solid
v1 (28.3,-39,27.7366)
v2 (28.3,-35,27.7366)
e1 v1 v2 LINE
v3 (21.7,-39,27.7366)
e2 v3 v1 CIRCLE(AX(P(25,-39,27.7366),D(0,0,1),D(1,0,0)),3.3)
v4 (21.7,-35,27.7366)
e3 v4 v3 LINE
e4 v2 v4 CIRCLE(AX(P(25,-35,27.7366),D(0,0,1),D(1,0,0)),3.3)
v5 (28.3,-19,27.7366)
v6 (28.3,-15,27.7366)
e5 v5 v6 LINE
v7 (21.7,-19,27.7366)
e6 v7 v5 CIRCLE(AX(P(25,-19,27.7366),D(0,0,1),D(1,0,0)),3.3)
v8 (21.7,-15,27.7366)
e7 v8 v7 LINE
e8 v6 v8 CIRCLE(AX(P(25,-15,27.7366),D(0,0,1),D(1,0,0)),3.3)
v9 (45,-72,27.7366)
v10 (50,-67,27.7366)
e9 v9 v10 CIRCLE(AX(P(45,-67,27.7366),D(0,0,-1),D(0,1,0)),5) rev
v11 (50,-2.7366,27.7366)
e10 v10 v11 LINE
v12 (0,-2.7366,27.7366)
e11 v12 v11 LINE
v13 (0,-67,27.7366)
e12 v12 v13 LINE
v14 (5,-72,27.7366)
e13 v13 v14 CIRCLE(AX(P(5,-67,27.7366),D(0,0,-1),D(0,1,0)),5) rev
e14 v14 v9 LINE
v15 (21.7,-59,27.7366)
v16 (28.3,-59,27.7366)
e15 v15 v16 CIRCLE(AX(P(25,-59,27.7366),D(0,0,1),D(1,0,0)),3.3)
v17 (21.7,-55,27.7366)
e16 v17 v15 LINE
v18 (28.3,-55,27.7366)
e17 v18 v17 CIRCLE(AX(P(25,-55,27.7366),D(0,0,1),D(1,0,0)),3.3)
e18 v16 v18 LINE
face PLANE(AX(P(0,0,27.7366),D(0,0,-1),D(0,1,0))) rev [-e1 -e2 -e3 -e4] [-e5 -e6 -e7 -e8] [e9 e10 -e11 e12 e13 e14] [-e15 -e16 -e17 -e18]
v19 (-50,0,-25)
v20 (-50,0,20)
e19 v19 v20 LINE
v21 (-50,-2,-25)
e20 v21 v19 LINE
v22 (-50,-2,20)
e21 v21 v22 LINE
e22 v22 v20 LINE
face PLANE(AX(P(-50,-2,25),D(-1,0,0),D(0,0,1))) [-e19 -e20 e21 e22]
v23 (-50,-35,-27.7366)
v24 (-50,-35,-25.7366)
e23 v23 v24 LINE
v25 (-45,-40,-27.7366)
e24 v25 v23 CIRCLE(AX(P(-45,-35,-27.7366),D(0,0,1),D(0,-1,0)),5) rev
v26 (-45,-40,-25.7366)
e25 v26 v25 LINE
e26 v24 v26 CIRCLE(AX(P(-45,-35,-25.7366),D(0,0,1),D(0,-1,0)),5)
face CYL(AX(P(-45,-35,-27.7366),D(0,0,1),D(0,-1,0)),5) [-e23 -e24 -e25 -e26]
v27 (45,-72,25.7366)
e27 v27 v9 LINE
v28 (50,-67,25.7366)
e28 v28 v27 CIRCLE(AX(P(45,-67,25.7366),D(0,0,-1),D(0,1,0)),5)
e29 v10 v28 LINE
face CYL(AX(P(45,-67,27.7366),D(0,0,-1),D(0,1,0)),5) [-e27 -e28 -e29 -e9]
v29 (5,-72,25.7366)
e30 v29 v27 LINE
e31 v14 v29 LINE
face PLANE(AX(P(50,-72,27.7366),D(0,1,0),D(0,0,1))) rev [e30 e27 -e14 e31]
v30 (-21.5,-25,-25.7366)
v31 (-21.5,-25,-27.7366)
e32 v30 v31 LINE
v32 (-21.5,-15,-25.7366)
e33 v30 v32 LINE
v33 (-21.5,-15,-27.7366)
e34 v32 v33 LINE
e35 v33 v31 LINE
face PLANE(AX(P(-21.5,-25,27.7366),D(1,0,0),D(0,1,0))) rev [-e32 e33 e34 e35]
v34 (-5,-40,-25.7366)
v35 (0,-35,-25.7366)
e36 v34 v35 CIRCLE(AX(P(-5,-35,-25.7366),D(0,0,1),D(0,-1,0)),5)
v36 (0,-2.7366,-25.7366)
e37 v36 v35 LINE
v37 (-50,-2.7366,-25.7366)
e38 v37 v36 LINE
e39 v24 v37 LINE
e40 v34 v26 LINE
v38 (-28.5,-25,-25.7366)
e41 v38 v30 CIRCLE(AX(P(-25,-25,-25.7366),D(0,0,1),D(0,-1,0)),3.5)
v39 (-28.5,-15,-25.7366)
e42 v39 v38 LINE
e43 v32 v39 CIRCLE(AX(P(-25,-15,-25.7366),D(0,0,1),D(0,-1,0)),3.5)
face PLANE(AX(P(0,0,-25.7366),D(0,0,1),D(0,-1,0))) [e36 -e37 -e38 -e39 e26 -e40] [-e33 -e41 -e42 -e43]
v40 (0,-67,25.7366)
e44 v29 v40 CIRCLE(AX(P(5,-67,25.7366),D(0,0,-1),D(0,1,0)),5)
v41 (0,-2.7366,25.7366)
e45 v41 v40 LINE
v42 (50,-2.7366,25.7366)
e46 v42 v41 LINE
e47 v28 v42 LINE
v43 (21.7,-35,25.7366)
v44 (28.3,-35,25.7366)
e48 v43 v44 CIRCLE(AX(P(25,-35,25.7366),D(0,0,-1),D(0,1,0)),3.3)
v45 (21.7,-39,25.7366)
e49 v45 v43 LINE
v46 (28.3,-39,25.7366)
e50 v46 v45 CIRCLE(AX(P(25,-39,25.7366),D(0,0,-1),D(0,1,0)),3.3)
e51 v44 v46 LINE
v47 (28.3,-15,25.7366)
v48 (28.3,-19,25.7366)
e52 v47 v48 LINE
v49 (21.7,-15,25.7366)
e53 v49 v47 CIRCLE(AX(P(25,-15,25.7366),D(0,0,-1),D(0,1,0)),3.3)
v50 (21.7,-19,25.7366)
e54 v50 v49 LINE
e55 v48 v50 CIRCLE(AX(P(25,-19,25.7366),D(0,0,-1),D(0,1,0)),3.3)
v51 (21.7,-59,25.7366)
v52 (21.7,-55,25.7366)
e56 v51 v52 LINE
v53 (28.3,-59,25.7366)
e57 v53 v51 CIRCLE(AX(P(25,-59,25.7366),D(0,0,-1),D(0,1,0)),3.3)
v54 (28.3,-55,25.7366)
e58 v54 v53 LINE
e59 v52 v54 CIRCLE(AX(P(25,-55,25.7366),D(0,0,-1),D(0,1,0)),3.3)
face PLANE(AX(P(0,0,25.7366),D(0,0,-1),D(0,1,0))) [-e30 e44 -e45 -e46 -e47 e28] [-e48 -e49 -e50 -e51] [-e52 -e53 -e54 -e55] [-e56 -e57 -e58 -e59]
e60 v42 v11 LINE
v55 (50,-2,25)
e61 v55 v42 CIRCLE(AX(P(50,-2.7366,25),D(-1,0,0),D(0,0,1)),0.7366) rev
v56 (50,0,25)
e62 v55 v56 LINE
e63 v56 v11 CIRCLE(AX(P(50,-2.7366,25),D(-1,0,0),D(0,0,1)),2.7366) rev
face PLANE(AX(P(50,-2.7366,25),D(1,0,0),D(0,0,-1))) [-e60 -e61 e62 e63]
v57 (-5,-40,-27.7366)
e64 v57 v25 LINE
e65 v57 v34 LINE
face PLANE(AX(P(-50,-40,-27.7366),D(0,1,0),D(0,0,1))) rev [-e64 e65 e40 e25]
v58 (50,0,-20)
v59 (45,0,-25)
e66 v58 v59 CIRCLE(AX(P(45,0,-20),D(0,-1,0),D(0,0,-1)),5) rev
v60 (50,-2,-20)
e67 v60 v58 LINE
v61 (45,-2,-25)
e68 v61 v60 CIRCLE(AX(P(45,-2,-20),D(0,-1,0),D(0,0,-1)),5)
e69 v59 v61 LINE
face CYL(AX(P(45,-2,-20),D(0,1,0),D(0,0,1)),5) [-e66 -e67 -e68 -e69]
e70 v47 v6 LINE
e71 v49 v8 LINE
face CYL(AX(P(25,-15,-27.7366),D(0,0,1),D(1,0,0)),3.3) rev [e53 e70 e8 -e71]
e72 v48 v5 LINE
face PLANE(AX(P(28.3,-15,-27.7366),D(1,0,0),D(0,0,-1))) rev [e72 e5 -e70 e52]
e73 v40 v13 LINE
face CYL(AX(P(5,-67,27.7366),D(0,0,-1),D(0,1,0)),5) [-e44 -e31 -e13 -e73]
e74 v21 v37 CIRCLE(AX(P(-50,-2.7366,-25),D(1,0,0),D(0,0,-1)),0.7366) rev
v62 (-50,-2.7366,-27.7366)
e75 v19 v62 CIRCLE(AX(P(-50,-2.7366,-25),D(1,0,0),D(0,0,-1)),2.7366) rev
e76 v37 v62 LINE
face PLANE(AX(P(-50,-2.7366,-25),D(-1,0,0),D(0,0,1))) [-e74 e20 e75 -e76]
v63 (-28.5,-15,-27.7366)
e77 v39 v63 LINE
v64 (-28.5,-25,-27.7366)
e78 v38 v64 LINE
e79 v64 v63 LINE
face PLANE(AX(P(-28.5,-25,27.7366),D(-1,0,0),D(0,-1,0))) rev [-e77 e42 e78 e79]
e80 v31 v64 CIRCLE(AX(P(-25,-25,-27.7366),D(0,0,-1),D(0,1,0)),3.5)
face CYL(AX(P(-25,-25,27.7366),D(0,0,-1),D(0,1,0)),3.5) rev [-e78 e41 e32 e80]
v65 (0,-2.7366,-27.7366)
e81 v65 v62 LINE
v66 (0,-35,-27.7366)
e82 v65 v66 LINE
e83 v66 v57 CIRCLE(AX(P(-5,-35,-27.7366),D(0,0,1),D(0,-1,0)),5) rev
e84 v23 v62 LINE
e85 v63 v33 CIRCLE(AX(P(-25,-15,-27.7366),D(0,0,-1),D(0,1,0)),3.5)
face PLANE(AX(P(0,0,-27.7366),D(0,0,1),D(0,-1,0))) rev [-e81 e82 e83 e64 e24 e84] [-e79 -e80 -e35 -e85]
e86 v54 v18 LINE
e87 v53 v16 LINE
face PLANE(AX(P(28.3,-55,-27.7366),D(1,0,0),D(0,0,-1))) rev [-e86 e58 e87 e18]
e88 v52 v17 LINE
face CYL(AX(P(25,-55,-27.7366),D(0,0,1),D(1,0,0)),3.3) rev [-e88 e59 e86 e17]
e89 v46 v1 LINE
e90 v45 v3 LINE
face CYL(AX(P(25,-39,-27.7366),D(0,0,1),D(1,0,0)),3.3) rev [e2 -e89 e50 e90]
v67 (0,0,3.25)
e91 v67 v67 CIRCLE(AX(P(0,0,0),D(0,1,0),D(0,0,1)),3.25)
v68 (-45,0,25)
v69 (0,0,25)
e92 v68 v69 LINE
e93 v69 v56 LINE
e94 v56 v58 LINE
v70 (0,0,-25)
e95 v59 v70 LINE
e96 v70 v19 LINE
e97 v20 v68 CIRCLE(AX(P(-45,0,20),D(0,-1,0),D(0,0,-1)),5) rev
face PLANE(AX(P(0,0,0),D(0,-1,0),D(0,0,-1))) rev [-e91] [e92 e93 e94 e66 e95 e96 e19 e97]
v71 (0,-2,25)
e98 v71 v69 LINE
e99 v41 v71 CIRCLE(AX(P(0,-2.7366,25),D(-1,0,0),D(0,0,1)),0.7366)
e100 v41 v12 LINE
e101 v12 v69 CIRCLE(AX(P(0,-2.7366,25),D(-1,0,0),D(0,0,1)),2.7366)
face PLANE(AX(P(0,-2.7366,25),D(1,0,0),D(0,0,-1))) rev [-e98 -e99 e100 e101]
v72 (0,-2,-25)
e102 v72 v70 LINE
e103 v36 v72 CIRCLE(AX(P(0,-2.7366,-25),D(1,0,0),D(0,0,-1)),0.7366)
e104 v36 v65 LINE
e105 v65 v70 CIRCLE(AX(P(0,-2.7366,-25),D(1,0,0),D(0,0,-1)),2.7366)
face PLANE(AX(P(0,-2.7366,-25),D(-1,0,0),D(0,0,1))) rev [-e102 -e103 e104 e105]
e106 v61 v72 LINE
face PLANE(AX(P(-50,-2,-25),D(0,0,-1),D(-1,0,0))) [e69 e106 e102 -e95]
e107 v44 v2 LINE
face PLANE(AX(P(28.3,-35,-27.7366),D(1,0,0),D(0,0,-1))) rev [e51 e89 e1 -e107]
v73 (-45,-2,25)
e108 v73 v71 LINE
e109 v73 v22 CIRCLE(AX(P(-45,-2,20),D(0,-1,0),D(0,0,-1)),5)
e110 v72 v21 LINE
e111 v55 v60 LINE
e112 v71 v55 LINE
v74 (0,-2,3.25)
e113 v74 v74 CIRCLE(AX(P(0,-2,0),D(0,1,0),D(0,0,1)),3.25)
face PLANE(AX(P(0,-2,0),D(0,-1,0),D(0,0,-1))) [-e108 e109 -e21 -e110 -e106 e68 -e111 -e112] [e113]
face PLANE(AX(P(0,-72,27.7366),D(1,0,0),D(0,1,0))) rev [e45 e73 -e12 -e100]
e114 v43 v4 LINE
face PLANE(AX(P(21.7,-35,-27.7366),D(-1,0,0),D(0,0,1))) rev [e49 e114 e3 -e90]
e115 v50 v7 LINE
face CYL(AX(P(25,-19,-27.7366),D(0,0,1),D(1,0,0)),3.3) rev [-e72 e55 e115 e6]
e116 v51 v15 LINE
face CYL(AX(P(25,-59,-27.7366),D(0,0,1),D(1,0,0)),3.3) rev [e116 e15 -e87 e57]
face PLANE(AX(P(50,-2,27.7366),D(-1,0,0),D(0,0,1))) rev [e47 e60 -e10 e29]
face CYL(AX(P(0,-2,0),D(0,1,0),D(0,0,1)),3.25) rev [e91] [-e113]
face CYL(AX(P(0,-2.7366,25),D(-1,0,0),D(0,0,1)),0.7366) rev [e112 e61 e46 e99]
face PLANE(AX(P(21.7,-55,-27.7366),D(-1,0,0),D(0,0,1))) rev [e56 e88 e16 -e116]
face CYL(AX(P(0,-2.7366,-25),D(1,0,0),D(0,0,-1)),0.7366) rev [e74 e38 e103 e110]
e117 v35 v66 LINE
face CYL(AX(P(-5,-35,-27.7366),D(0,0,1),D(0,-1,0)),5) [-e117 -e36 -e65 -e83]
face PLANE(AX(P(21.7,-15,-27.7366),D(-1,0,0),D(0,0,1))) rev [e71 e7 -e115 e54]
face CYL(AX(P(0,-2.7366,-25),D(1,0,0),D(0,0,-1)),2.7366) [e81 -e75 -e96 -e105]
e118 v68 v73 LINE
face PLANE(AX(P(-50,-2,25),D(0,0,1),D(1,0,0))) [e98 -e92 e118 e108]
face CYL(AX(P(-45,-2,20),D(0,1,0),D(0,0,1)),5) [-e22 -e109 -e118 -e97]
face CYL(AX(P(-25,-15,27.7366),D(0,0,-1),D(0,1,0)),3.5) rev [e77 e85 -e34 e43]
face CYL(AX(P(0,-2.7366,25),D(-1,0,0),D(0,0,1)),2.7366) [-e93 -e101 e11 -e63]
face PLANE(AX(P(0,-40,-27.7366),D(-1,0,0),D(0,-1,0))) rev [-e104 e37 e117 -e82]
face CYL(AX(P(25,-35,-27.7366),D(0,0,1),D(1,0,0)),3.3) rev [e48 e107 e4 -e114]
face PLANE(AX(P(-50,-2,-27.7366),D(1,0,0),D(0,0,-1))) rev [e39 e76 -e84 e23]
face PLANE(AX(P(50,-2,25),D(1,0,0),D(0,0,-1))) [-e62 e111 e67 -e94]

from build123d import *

# Parameters (mm, degrees)
SKETCH1_W          = 100
SKETCH1_H          = 50
BASE_FLANGE1_DEPTH = 2
SKETCH8_R          = 3.25
CUT_EXTRUDE1_DEPTH = 56.937465084
EDGE_FLANGE1_DEPTH = 50
EDGE_FLANGE2_DEPTH = 50
CUT_EXTRUDE2_DEPTH = 104.736569821
CUT_EXTRUDE3_DEPTH = 104.736569821
LPATTERN1_COUNT    = 3
LPATTERN1_PITCH    = 20
FILLET1_R          = 5


# Sheet-metal steps are written as plain solids
with BuildPart() as part:
    # Sketch1 → Base-Flange1 (new body)
    with BuildSketch(Plane(origin=(0, 0, 0), x_dir=(1, 0, 0), z_dir=(0, 1, 0))):
        Rectangle(SKETCH1_W, SKETCH1_H)
    extrude(amount=-BASE_FLANGE1_DEPTH)

    # Sketch8 → Cut-Extrude1 (cut, through all)
    with BuildSketch(Plane(origin=(0, 0, 0), x_dir=(1, 0, 0), z_dir=(0, 1, 0))):
        with Locations(Location((0, 0, 0), (0, 0, 270))):
            Circle(SKETCH8_R)
    extrude(amount=-CUT_EXTRUDE1_DEPTH, mode=Mode.SUBTRACT)

    # Edge-Flange1 section (across the edge) → Edge-Flange1 (add)
    with BuildSketch(Plane(origin=(50, -2, 25.7366), x_dir=(0, 0, -1), z_dir=(-1, 0, 0))):
        with BuildLine():
            Line((-2, 0.7366), (-2, 70))
            Line((-2, 70), (0, 70))
            Line((0, 70), (0, 0.7366))
            ThreePointArc((0, 0.7366), (0.215745145, 0.215745145), (0.7366, 0))
            Line((0.7366, 0), (0.7366, -2))
            ThreePointArc((0.7366, -2), (-1.198468417, -1.198468417), (-2, 0.7366))
        make_face()
    extrude(amount=EDGE_FLANGE1_DEPTH)

    # Edge-Flange2 section (across the edge) → Edge-Flange2 (add)
    with BuildSketch(Plane(origin=(-50, -2, -25.7366), x_dir=(0, 0, 1), z_dir=(1, 0, 0))):
        with BuildLine():
            Line((-2, 0.7366), (-2, 38))
            Line((-2, 38), (0, 38))
            Line((0, 38), (0, 0.7366))
            ThreePointArc((0, 0.7366), (0.215745145, 0.215745145), (0.7366, 0))
            Line((0.7366, 0), (0.7366, -2))
            ThreePointArc((0.7366, -2), (-1.198468417, -1.198468417), (-2, 0.7366))
        make_face()
    extrude(amount=EDGE_FLANGE2_DEPTH)

    # Sketch12 → Cut-Extrude2 (cut, through all)
    with BuildSketch(Plane.XY.offset(27.7366)):
        with BuildLine():
            Line((28.3, -55), (28.3, -59))
            ThreePointArc((28.3, -59), (25, -62.3), (21.7, -59))
            Line((21.7, -59), (21.7, -55))
            ThreePointArc((21.7, -55), (25, -51.7), (28.3, -55))
        make_face()
    cut_extrude2 = extrude(amount=-CUT_EXTRUDE2_DEPTH, mode=Mode.SUBTRACT)

    # Sketch16 → Cut-Extrude3 (cut, through all)
    with BuildSketch(Plane(origin=(0, 0, -27.7366), x_dir=(-1, 0, 0), z_dir=(0, 0, -1))):
        with BuildLine():
            Line((21.5, -25), (21.5, -15))
            ThreePointArc((21.5, -15), (25, -11.5), (28.5, -15))
            Line((28.5, -15), (28.5, -25))
            ThreePointArc((28.5, -25), (25, -28.5), (21.5, -25))
        make_face()
    extrude(amount=-CUT_EXTRUDE3_DEPTH, mode=Mode.SUBTRACT)

    # LPattern1: Cut-Extrude2 ×3
    with Locations(*[(0, i * LPATTERN1_PITCH, 0) for i in range(1, LPATTERN1_COUNT)]):
        add(cut_extrude2, mode=Mode.SUBTRACT)

    # Fillet1
    fillet1_edges = [part.edges().sort_by_distance(p)[0] for p in [
        (50, -72, 26.7366),
        (0, -72, 26.7366),
        (-50, -1, 25),
        (50, -1, -25),
        (-50, -40, -26.7366),
        (0, -40, -26.7366),
    ]]
    fillet(fillet1_edges, radius=FILLET1_R)


solid = part.part
